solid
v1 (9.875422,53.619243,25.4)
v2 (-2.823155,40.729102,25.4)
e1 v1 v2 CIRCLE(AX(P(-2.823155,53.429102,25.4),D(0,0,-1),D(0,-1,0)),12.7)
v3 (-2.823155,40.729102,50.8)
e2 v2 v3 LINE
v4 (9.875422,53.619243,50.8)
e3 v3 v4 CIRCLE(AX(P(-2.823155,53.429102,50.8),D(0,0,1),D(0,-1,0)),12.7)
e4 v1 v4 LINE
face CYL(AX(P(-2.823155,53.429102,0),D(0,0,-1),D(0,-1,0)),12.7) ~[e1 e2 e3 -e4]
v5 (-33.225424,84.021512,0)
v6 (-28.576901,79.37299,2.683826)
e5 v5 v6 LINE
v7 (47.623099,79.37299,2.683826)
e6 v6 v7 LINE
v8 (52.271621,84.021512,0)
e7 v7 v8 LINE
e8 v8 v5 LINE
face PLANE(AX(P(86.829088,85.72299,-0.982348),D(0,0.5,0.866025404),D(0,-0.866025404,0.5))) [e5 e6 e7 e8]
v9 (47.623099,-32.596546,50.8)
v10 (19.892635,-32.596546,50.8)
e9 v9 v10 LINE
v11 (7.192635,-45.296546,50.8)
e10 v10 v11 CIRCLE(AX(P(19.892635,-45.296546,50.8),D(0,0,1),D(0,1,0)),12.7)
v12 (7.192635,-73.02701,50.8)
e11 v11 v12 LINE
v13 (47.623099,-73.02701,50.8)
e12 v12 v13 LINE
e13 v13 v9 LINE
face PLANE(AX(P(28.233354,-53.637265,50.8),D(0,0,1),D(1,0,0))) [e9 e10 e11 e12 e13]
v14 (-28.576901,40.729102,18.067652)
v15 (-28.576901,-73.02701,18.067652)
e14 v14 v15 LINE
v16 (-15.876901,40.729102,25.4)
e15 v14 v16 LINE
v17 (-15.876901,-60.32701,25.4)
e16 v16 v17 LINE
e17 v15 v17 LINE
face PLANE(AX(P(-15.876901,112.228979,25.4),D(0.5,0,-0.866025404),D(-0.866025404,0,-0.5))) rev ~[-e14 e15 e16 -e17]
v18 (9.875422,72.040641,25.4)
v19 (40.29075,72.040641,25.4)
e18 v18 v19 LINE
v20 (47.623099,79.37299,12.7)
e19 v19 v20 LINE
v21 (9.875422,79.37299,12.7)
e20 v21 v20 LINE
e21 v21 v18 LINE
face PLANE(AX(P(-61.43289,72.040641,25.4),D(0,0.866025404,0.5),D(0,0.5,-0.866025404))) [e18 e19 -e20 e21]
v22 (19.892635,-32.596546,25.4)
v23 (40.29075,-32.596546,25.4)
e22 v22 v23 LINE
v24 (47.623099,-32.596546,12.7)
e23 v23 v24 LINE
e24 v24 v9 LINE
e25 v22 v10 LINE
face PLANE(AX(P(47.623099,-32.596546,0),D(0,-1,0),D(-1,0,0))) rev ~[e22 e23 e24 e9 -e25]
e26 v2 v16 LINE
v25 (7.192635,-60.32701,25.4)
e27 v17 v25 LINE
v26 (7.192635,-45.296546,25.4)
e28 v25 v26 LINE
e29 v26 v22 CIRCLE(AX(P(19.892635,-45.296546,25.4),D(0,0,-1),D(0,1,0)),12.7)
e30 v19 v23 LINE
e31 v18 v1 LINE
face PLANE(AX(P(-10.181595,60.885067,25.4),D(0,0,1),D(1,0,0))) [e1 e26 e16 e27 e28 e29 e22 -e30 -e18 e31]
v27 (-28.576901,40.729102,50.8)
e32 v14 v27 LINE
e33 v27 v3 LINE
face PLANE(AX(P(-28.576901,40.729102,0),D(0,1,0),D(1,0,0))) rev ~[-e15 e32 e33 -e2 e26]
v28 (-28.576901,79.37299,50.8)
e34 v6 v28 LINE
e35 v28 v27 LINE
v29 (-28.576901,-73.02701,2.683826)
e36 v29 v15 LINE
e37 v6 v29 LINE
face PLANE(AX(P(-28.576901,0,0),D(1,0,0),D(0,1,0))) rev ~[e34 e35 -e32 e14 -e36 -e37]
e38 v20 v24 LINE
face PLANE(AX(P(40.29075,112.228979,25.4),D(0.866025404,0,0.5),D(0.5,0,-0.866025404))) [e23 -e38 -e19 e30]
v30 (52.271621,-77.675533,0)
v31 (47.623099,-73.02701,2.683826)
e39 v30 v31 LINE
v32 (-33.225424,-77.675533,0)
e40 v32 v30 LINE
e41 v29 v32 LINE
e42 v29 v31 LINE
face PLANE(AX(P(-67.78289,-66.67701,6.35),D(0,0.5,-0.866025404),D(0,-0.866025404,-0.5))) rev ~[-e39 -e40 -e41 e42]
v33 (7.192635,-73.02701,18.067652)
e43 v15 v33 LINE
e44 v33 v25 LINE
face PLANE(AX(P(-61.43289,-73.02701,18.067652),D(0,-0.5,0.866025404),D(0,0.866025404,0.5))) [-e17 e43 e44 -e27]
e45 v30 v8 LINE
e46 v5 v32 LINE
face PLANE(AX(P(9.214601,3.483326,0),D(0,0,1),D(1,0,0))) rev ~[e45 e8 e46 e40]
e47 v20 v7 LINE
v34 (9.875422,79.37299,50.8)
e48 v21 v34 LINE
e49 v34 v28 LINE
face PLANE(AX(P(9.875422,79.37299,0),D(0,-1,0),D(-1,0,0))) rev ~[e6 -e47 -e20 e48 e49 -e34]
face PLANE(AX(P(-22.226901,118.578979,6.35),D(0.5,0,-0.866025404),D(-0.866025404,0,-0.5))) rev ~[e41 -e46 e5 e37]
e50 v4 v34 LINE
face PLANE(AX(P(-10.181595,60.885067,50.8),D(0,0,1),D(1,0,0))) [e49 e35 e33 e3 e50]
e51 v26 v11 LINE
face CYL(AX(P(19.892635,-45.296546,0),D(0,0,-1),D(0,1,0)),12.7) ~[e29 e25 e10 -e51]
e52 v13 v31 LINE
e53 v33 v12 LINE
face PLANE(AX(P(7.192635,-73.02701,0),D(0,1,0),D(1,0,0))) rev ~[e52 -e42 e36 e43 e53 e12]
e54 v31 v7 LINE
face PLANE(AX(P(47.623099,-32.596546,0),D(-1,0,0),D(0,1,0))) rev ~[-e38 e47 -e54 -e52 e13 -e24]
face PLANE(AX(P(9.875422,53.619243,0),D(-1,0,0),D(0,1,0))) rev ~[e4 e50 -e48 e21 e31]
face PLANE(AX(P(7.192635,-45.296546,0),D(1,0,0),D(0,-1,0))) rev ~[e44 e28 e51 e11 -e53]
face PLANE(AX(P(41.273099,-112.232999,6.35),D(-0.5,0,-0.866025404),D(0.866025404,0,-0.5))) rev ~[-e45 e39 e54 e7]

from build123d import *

# Parameters (mm, degrees)
F0_W          = 88.9
F0_H          = 165.1
F1_DEPTH      = 6.35
F2_DEPTH      = 25.4
F3_DEPTH      = 25.4
F4_T1_DEPTH   = 141.911978168
F4_T3_DEPTH   = 218.111978168
F4_T8_DEPTH   = 154.611978168
F4_T14_DEPTH  = 154.611978168
F4_T20_DEPTH  = 154.611978168
F4_T27_DEPTH  = 154.611978168
F4_T33_DEPTH  = 154.611978168
F4_T39_DEPTH  = 230.811978168
F4_T45_DEPTH  = 230.811978168
F4_T51_DEPTH  = 230.811978168
F4_T58_DEPTH  = 230.811978168
F4_T64_DEPTH  = 230.811978168
F4_T70_DEPTH  = 230.811978168
F4_T76_DEPTH  = 230.811978168
F4_T82_DEPTH  = 230.811978168
F4_T89_DEPTH  = 230.811978168
F4_T95_DEPTH  = 230.811978168
F4_T101_DEPTH = 154.611978168
F4_T107_DEPTH = 154.611978168
F4_T113_DEPTH = 154.611978168
F4_T120_DEPTH = 154.611978168
F4_T126_DEPTH = 154.611978168
F5_DEPTH      = 50.8


# Not quite as in the source:
# - a fillet or chamfer that OpenCascade refuses, or shapes differently, is made with other operations: its cross-section is extruded or revolved along the edge and cut away or added


with BuildPart() as f1:
    # F0 (on Top) → F1 (new body)
    with BuildSketch(Plane.XY):
        with Locations((9.5230986749, 3.1729897651)):
            Rectangle(F0_W, F0_H)
        Polygon((-28.5769013251, 40.7291018275), (-28.5769013251, 79.3729897651), (9.8754219143, 79.3729897651), (47.6230986749, 79.3729897651), (47.6230986749, -32.5965460718), (47.6230986749, -73.0270102349), (7.1926345117, -73.0270102349), (-28.5769013251, -73.0270102349), align=None, mode=Mode.SUBTRACT)
    extrude(amount=F1_DEPTH)

    # F0 (on Top) → F2 (join)
    with BuildSketch(Plane.XY):
        with BuildLine():
            Line((47.6230986749, 79.3729897651), (9.8754219143, 79.3729897651))
            Line((9.8754219143, 79.3729897651), (9.8754219143, 53.6192430722))
            ThreePointArc((9.8754219143, 53.6192430722), (6.2240768174, 44.5163243089), (-2.8231546322, 40.7291018275))
            Line((-2.8231546322, 40.7291018275), (-28.5769013251, 40.7291018275))
            Line((-28.5769013251, 40.7291018275), (-28.5769013251, -73.0270102349))
            Line((-28.5769013251, -73.0270102349), (7.1926345117, -73.0270102349))
            Line((7.1926345117, -73.0270102349), (7.1926345117, -45.2965460718))
            ThreePointArc((7.1926345117, -45.2965460718), (10.9123783907, -36.3162899507), (19.8926345117, -32.5965460718))
            Line((19.8926345117, -32.5965460718), (47.6230986749, -32.5965460718))
            Line((47.6230986749, -32.5965460718), (47.6230986749, 79.3729897651))
        make_face()
    extrude(amount=F2_DEPTH)

    # F0 (on Top) → F3 (join)
    with BuildSketch(Plane.XY):
        with BuildLine():
            Line((9.8754219143, 79.3729897651), (-28.5769013251, 79.3729897651))
            Line((-28.5769013251, 79.3729897651), (-28.5769013251, 40.7291018275))
            Line((-28.5769013251, 40.7291018275), (-2.8231546322, 40.7291018275))
            ThreePointArc((-2.8231546322, 40.7291018275), (6.2240768174, 44.5163243089), (9.8754219143, 53.6192430722))
            Line((9.8754219143, 53.6192430722), (9.8754219143, 79.3729897651))
        make_face()
        with BuildLine():
            Line((47.6230986749, -73.0270102349), (47.6230986749, -32.5965460718))
            Line((47.6230986749, -32.5965460718), (19.8926345117, -32.5965460718))
            ThreePointArc((19.8926345117, -32.5965460718), (10.9123783907, -36.3162899507), (7.1926345117, -45.2965460718))
            Line((7.1926345117, -45.2965460718), (7.1926345117, -73.0270102349))
            Line((7.1926345117, -73.0270102349), (47.6230986749, -73.0270102349))
        make_face()
    extrude(amount=F3_DEPTH)

    # F4: chamfer of 12.7 x 7.3323484187 on 8 edges, made by hand

    # F4_s2 → F4_t1 (cut)
    with BuildSketch(Plane.YZ.offset(-61.4328904091)):
        Polygon((-73.0270102349, 18.0676515813), (-60.3270102349, 25.4), (-73.0270102349, 25.4), align=None)
        Polygon((72.0406413464, 25.4), (79.3729897651, 12.7), (79.3729897651, 25.4), align=None)
    extrude(amount=F4_T1_DEPTH, mode=Mode.SUBTRACT)

    # F4_s4 → F4_t3 (cut)
    with BuildSketch(Plane.XZ.offset(-112.2289788491)):
        Polygon((-15.8769013251, 25.4), (-28.5769013251, 18.0676515813), (-28.5769013251, 25.4), align=None)
        Polygon((40.2907502562, 25.4), (47.6230986749, 12.7), (47.6230986749, 25.4), align=None)
    extrude(amount=F4_T3_DEPTH, mode=Mode.SUBTRACT)


with BuildPart() as f4_tool6:
    # F4_s7 → F4_t8 (new body)
    with BuildSketch(Plane.YZ.offset(-67.7828904091)):
        Polygon((-66.6770102349, 6.35), (-79.3770102349, -0.9823484187), (-79.3770102349, 6.35), align=None)
    extrude(amount=F4_T8_DEPTH)

    split(bisect_by=Plane.YZ.offset(-28.5769013251), keep=Keep.BOTTOM)

    split(bisect_by=Plane.XZ.offset(73.0270102349), keep=Keep.BOTTOM)


with BuildPart() as f1_1:
    add(f1.part)

    # F4_t5: cut F4_tool6
    add(f4_tool6.part, mode=Mode.SUBTRACT)


with BuildPart() as f4_tool12:
    # F4_s13 → F4_t14 (new body)
    with BuildSketch(Plane.YZ.offset(-67.7828904091)):
        Polygon((-66.6770102349, 6.35), (-79.3770102349, -0.9823484187), (-79.3770102349, 6.35), align=None)
    extrude(amount=F4_T14_DEPTH)

    split(bisect_by=Plane.YZ.offset(-28.5769013251), keep=Keep.BOTTOM)

    split(bisect_by=Plane.XZ.offset(73.0270102349), keep=Keep.TOP)


with BuildPart() as f1_2:
    add(f1_1.part)

    # F4_t11: cut F4_tool12
    add(f4_tool12.part, mode=Mode.SUBTRACT)


with BuildPart() as f4_tool18:
    # F4_s19 → F4_t20 (new body)
    with BuildSketch(Plane.YZ.offset(-67.7828904091)):
        Polygon((-66.6770102349, 6.35), (-79.3770102349, -0.9823484187), (-79.3770102349, 6.35), align=None)
    extrude(amount=F4_T20_DEPTH)

    split(bisect_by=Plane.YZ.offset(-28.5769013251), keep=Keep.TOP)

    split(bisect_by=Plane.YZ.offset(47.6230986749), keep=Keep.BOTTOM)

    split(bisect_by=Plane.XZ.offset(73.0270102349), keep=Keep.TOP)


with BuildPart() as f1_3:
    add(f1_2.part)

    # F4_t17: cut F4_tool18
    add(f4_tool18.part, mode=Mode.SUBTRACT)


with BuildPart() as f4_tool25:
    # F4_s26 → F4_t27 (new body)
    with BuildSketch(Plane.YZ.offset(-67.7828904091)):
        Polygon((-66.6770102349, 6.35), (-79.3770102349, -0.9823484187), (-79.3770102349, 6.35), align=None)
    extrude(amount=F4_T27_DEPTH)

    split(bisect_by=Plane.YZ.offset(47.6230986749), keep=Keep.TOP)

    split(bisect_by=Plane.XZ.offset(73.0270102349), keep=Keep.BOTTOM)


with BuildPart() as f1_4:
    add(f1_3.part)

    # F4_t24: cut F4_tool25
    add(f4_tool25.part, mode=Mode.SUBTRACT)


with BuildPart() as f4_tool31:
    # F4_s32 → F4_t33 (new body)
    with BuildSketch(Plane.YZ.offset(-67.7828904091)):
        Polygon((-66.6770102349, 6.35), (-79.3770102349, -0.9823484187), (-79.3770102349, 6.35), align=None)
    extrude(amount=F4_T33_DEPTH)

    split(bisect_by=Plane.YZ.offset(47.6230986749), keep=Keep.TOP)

    split(bisect_by=Plane.XZ.offset(73.0270102349), keep=Keep.TOP)


with BuildPart() as f1_5:
    add(f1_4.part)

    # F4_t30: cut F4_tool31
    add(f4_tool31.part, mode=Mode.SUBTRACT)


with BuildPart() as f4_tool37:
    # F4_s38 → F4_t39 (new body)
    with BuildSketch(Plane.XZ.offset(112.2329993189)):
        Polygon((41.2730986749, 6.35), (53.9730986749, -0.9823484187), (53.9730986749, 6.35), align=None)
    extrude(amount=-F4_T39_DEPTH)

    split(bisect_by=Plane.YZ.offset(47.6230986749), keep=Keep.BOTTOM)

    split(bisect_by=Plane.XZ.offset(73.0270102349), keep=Keep.TOP)


with BuildPart() as f1_6:
    add(f1_5.part)

    # F4_t36: cut F4_tool37
    add(f4_tool37.part, mode=Mode.SUBTRACT)


with BuildPart() as f4_tool43:
    # F4_s44 → F4_t45 (new body)
    with BuildSketch(Plane.XZ.offset(112.2329993189)):
        Polygon((41.2730986749, 6.35), (53.9730986749, -0.9823484187), (53.9730986749, 6.35), align=None)
    extrude(amount=-F4_T45_DEPTH)

    split(bisect_by=Plane.YZ.offset(47.6230986749), keep=Keep.TOP)

    split(bisect_by=Plane.XZ.offset(73.0270102349), keep=Keep.TOP)


with BuildPart() as f1_7:
    add(f1_6.part)

    # F4_t42: cut F4_tool43
    add(f4_tool43.part, mode=Mode.SUBTRACT)


with BuildPart() as f4_tool49:
    # F4_s50 → F4_t51 (new body)
    with BuildSketch(Plane.XZ.offset(112.2329993189)):
        Polygon((41.2730986749, 6.35), (53.9730986749, -0.9823484187), (53.9730986749, 6.35), align=None)
    extrude(amount=-F4_T51_DEPTH)

    split(bisect_by=Plane.XZ.offset(-79.3729897651), keep=Keep.TOP)

    split(bisect_by=Plane.YZ.offset(47.6230986749), keep=Keep.TOP)

    split(bisect_by=Plane.XZ.offset(73.0270102349), keep=Keep.BOTTOM)


with BuildPart() as f1_8:
    add(f1_7.part)

    # F4_t48: cut F4_tool49
    add(f4_tool49.part, mode=Mode.SUBTRACT)


with BuildPart() as f4_tool56:
    # F4_s57 → F4_t58 (new body)
    with BuildSketch(Plane.XZ.offset(112.2329993189)):
        Polygon((41.2730986749, 6.35), (53.9730986749, -0.9823484187), (53.9730986749, 6.35), align=None)
    extrude(amount=-F4_T58_DEPTH)

    split(bisect_by=Plane.XZ.offset(-79.3729897651), keep=Keep.BOTTOM)

    split(bisect_by=Plane.YZ.offset(47.6230986749), keep=Keep.BOTTOM)


with BuildPart() as f1_9:
    add(f1_8.part)

    # F4_t55: cut F4_tool56
    add(f4_tool56.part, mode=Mode.SUBTRACT)


with BuildPart() as f4_tool62:
    # F4_s63 → F4_t64 (new body)
    with BuildSketch(Plane.XZ.offset(112.2329993189)):
        Polygon((41.2730986749, 6.35), (53.9730986749, -0.9823484187), (53.9730986749, 6.35), align=None)
    extrude(amount=-F4_T64_DEPTH)

    split(bisect_by=Plane.XZ.offset(-79.3729897651), keep=Keep.BOTTOM)

    split(bisect_by=Plane.YZ.offset(47.6230986749), keep=Keep.TOP)


with BuildPart() as f1_10:
    add(f1_9.part)

    # F4_t61: cut F4_tool62
    add(f4_tool62.part, mode=Mode.SUBTRACT)


with BuildPart() as f4_tool68:
    # F4_s69 → F4_t70 (new body)
    with BuildSketch(Plane.XZ.offset(-118.5789788491)):
        Polygon((-22.2269013251, 6.35), (-34.9269013251, -0.9823484187), (-34.9269013251, 6.35), align=None)
    extrude(amount=F4_T70_DEPTH)

    split(bisect_by=Plane.YZ.offset(-28.5769013251), keep=Keep.TOP)

    split(bisect_by=Plane.XZ.offset(-79.3729897651), keep=Keep.BOTTOM)


with BuildPart() as f1_11:
    add(f1_10.part)

    # F4_t67: cut F4_tool68
    add(f4_tool68.part, mode=Mode.SUBTRACT)


with BuildPart() as f4_tool74:
    # F4_s75 → F4_t76 (new body)
    with BuildSketch(Plane.XZ.offset(-118.5789788491)):
        Polygon((-22.2269013251, 6.35), (-34.9269013251, -0.9823484187), (-34.9269013251, 6.35), align=None)
    extrude(amount=F4_T76_DEPTH)

    split(bisect_by=Plane.YZ.offset(-28.5769013251), keep=Keep.BOTTOM)

    split(bisect_by=Plane.XZ.offset(-79.3729897651), keep=Keep.BOTTOM)


with BuildPart() as f1_12:
    add(f1_11.part)

    # F4_t73: cut F4_tool74
    add(f4_tool74.part, mode=Mode.SUBTRACT)


with BuildPart() as f4_tool80:
    # F4_s81 → F4_t82 (new body)
    with BuildSketch(Plane.XZ.offset(-118.5789788491)):
        Polygon((-22.2269013251, 6.35), (-34.9269013251, -0.9823484187), (-34.9269013251, 6.35), align=None)
    extrude(amount=F4_T82_DEPTH)

    split(bisect_by=Plane.YZ.offset(-28.5769013251), keep=Keep.BOTTOM)

    split(bisect_by=Plane.XZ.offset(-79.3729897651), keep=Keep.TOP)

    split(bisect_by=Plane.XZ.offset(73.0270102349), keep=Keep.BOTTOM)


with BuildPart() as f1_13:
    add(f1_12.part)

    # F4_t79: cut F4_tool80
    add(f4_tool80.part, mode=Mode.SUBTRACT)


with BuildPart() as f4_tool87:
    # F4_s88 → F4_t89 (new body)
    with BuildSketch(Plane.XZ.offset(-118.5789788491)):
        Polygon((-22.2269013251, 6.35), (-34.9269013251, -0.9823484187), (-34.9269013251, 6.35), align=None)
    extrude(amount=F4_T89_DEPTH)

    split(bisect_by=Plane.YZ.offset(-28.5769013251), keep=Keep.TOP)

    split(bisect_by=Plane.XZ.offset(73.0270102349), keep=Keep.TOP)


with BuildPart() as f1_14:
    add(f1_13.part)

    # F4_t86: cut F4_tool87
    add(f4_tool87.part, mode=Mode.SUBTRACT)


with BuildPart() as f4_tool93:
    # F4_s94 → F4_t95 (new body)
    with BuildSketch(Plane.XZ.offset(-118.5789788491)):
        Polygon((-22.2269013251, 6.35), (-34.9269013251, -0.9823484187), (-34.9269013251, 6.35), align=None)
    extrude(amount=F4_T95_DEPTH)

    split(bisect_by=Plane.YZ.offset(-28.5769013251), keep=Keep.BOTTOM)

    split(bisect_by=Plane.XZ.offset(73.0270102349), keep=Keep.TOP)


with BuildPart() as f1_15:
    add(f1_14.part)

    # F4_t92: cut F4_tool93
    add(f4_tool93.part, mode=Mode.SUBTRACT)


with BuildPart() as f4_tool99:
    # F4_s100 → F4_t101 (new body)
    with BuildSketch(Plane.YZ.offset(86.8290877589)):
        Polygon((85.7229897651, -0.9823484187), (73.0229897651, 6.35), (85.7229897651, 6.35), align=None)
    extrude(amount=-F4_T101_DEPTH)

    split(bisect_by=Plane.XZ.offset(-79.3729897651), keep=Keep.BOTTOM)

    split(bisect_by=Plane.YZ.offset(47.6230986749), keep=Keep.TOP)


with BuildPart() as f1_16:
    add(f1_15.part)

    # F4_t98: cut F4_tool99
    add(f4_tool99.part, mode=Mode.SUBTRACT)


with BuildPart() as f4_tool105:
    # F4_s106 → F4_t107 (new body)
    with BuildSketch(Plane.YZ.offset(86.8290877589)):
        Polygon((85.7229897651, -0.9823484187), (73.0229897651, 6.35), (85.7229897651, 6.35), align=None)
    extrude(amount=-F4_T107_DEPTH)

    split(bisect_by=Plane.XZ.offset(-79.3729897651), keep=Keep.TOP)

    split(bisect_by=Plane.YZ.offset(47.6230986749), keep=Keep.TOP)


with BuildPart() as f1_17:
    add(f1_16.part)

    # F4_t104: cut F4_tool105
    add(f4_tool105.part, mode=Mode.SUBTRACT)


with BuildPart() as f4_tool111:
    # F4_s112 → F4_t113 (new body)
    with BuildSketch(Plane.YZ.offset(86.8290877589)):
        Polygon((85.7229897651, -0.9823484187), (73.0229897651, 6.35), (85.7229897651, 6.35), align=None)
    extrude(amount=-F4_T113_DEPTH)

    split(bisect_by=Plane.YZ.offset(-28.5769013251), keep=Keep.TOP)

    split(bisect_by=Plane.XZ.offset(-79.3729897651), keep=Keep.BOTTOM)

    split(bisect_by=Plane.YZ.offset(47.6230986749), keep=Keep.BOTTOM)


with BuildPart() as f1_18:
    add(f1_17.part)

    # F4_t110: cut F4_tool111
    add(f4_tool111.part, mode=Mode.SUBTRACT)


with BuildPart() as f4_tool118:
    # F4_s119 → F4_t120 (new body)
    with BuildSketch(Plane.YZ.offset(86.8290877589)):
        Polygon((85.7229897651, -0.9823484187), (73.0229897651, 6.35), (85.7229897651, 6.35), align=None)
    extrude(amount=-F4_T120_DEPTH)

    split(bisect_by=Plane.YZ.offset(-28.5769013251), keep=Keep.BOTTOM)

    split(bisect_by=Plane.XZ.offset(-79.3729897651), keep=Keep.BOTTOM)


with BuildPart() as f1_19:
    add(f1_18.part)

    # F4_t117: cut F4_tool118
    add(f4_tool118.part, mode=Mode.SUBTRACT)


with BuildPart() as f4_tool124:
    # F4_s125 → F4_t126 (new body)
    with BuildSketch(Plane.YZ.offset(86.8290877589)):
        Polygon((85.7229897651, -0.9823484187), (73.0229897651, 6.35), (85.7229897651, 6.35), align=None)
    extrude(amount=-F4_T126_DEPTH)

    split(bisect_by=Plane.YZ.offset(-28.5769013251), keep=Keep.BOTTOM)

    split(bisect_by=Plane.XZ.offset(-79.3729897651), keep=Keep.TOP)


with BuildPart() as f1_20:
    add(f1_19.part)

    # F4_t123: cut F4_tool124
    add(f4_tool124.part, mode=Mode.SUBTRACT)

    # F0 (on Top) → F5 (join)
    with BuildSketch(Plane.XY):
        with BuildLine():
            Line((47.6230986749, -73.0270102349), (47.6230986749, -32.5965460718))
            Line((47.6230986749, -32.5965460718), (19.8926345117, -32.5965460718))
            ThreePointArc((19.8926345117, -32.5965460718), (10.9123783907, -36.3162899507), (7.1926345117, -45.2965460718))
            Line((7.1926345117, -45.2965460718), (7.1926345117, -73.0270102349))
            Line((7.1926345117, -73.0270102349), (47.6230986749, -73.0270102349))
        make_face()
        with BuildLine():
            Line((9.8754219143, 79.3729897651), (-28.5769013251, 79.3729897651))
            Line((-28.5769013251, 79.3729897651), (-28.5769013251, 40.7291018275))
            Line((-28.5769013251, 40.7291018275), (-2.8231546322, 40.7291018275))
            ThreePointArc((-2.8231546322, 40.7291018275), (6.2240768174, 44.5163243089), (9.8754219143, 53.6192430722))
            Line((9.8754219143, 53.6192430722), (9.8754219143, 79.3729897651))
        make_face()
    extrude(amount=F5_DEPTH)


solid = f1_20.part
